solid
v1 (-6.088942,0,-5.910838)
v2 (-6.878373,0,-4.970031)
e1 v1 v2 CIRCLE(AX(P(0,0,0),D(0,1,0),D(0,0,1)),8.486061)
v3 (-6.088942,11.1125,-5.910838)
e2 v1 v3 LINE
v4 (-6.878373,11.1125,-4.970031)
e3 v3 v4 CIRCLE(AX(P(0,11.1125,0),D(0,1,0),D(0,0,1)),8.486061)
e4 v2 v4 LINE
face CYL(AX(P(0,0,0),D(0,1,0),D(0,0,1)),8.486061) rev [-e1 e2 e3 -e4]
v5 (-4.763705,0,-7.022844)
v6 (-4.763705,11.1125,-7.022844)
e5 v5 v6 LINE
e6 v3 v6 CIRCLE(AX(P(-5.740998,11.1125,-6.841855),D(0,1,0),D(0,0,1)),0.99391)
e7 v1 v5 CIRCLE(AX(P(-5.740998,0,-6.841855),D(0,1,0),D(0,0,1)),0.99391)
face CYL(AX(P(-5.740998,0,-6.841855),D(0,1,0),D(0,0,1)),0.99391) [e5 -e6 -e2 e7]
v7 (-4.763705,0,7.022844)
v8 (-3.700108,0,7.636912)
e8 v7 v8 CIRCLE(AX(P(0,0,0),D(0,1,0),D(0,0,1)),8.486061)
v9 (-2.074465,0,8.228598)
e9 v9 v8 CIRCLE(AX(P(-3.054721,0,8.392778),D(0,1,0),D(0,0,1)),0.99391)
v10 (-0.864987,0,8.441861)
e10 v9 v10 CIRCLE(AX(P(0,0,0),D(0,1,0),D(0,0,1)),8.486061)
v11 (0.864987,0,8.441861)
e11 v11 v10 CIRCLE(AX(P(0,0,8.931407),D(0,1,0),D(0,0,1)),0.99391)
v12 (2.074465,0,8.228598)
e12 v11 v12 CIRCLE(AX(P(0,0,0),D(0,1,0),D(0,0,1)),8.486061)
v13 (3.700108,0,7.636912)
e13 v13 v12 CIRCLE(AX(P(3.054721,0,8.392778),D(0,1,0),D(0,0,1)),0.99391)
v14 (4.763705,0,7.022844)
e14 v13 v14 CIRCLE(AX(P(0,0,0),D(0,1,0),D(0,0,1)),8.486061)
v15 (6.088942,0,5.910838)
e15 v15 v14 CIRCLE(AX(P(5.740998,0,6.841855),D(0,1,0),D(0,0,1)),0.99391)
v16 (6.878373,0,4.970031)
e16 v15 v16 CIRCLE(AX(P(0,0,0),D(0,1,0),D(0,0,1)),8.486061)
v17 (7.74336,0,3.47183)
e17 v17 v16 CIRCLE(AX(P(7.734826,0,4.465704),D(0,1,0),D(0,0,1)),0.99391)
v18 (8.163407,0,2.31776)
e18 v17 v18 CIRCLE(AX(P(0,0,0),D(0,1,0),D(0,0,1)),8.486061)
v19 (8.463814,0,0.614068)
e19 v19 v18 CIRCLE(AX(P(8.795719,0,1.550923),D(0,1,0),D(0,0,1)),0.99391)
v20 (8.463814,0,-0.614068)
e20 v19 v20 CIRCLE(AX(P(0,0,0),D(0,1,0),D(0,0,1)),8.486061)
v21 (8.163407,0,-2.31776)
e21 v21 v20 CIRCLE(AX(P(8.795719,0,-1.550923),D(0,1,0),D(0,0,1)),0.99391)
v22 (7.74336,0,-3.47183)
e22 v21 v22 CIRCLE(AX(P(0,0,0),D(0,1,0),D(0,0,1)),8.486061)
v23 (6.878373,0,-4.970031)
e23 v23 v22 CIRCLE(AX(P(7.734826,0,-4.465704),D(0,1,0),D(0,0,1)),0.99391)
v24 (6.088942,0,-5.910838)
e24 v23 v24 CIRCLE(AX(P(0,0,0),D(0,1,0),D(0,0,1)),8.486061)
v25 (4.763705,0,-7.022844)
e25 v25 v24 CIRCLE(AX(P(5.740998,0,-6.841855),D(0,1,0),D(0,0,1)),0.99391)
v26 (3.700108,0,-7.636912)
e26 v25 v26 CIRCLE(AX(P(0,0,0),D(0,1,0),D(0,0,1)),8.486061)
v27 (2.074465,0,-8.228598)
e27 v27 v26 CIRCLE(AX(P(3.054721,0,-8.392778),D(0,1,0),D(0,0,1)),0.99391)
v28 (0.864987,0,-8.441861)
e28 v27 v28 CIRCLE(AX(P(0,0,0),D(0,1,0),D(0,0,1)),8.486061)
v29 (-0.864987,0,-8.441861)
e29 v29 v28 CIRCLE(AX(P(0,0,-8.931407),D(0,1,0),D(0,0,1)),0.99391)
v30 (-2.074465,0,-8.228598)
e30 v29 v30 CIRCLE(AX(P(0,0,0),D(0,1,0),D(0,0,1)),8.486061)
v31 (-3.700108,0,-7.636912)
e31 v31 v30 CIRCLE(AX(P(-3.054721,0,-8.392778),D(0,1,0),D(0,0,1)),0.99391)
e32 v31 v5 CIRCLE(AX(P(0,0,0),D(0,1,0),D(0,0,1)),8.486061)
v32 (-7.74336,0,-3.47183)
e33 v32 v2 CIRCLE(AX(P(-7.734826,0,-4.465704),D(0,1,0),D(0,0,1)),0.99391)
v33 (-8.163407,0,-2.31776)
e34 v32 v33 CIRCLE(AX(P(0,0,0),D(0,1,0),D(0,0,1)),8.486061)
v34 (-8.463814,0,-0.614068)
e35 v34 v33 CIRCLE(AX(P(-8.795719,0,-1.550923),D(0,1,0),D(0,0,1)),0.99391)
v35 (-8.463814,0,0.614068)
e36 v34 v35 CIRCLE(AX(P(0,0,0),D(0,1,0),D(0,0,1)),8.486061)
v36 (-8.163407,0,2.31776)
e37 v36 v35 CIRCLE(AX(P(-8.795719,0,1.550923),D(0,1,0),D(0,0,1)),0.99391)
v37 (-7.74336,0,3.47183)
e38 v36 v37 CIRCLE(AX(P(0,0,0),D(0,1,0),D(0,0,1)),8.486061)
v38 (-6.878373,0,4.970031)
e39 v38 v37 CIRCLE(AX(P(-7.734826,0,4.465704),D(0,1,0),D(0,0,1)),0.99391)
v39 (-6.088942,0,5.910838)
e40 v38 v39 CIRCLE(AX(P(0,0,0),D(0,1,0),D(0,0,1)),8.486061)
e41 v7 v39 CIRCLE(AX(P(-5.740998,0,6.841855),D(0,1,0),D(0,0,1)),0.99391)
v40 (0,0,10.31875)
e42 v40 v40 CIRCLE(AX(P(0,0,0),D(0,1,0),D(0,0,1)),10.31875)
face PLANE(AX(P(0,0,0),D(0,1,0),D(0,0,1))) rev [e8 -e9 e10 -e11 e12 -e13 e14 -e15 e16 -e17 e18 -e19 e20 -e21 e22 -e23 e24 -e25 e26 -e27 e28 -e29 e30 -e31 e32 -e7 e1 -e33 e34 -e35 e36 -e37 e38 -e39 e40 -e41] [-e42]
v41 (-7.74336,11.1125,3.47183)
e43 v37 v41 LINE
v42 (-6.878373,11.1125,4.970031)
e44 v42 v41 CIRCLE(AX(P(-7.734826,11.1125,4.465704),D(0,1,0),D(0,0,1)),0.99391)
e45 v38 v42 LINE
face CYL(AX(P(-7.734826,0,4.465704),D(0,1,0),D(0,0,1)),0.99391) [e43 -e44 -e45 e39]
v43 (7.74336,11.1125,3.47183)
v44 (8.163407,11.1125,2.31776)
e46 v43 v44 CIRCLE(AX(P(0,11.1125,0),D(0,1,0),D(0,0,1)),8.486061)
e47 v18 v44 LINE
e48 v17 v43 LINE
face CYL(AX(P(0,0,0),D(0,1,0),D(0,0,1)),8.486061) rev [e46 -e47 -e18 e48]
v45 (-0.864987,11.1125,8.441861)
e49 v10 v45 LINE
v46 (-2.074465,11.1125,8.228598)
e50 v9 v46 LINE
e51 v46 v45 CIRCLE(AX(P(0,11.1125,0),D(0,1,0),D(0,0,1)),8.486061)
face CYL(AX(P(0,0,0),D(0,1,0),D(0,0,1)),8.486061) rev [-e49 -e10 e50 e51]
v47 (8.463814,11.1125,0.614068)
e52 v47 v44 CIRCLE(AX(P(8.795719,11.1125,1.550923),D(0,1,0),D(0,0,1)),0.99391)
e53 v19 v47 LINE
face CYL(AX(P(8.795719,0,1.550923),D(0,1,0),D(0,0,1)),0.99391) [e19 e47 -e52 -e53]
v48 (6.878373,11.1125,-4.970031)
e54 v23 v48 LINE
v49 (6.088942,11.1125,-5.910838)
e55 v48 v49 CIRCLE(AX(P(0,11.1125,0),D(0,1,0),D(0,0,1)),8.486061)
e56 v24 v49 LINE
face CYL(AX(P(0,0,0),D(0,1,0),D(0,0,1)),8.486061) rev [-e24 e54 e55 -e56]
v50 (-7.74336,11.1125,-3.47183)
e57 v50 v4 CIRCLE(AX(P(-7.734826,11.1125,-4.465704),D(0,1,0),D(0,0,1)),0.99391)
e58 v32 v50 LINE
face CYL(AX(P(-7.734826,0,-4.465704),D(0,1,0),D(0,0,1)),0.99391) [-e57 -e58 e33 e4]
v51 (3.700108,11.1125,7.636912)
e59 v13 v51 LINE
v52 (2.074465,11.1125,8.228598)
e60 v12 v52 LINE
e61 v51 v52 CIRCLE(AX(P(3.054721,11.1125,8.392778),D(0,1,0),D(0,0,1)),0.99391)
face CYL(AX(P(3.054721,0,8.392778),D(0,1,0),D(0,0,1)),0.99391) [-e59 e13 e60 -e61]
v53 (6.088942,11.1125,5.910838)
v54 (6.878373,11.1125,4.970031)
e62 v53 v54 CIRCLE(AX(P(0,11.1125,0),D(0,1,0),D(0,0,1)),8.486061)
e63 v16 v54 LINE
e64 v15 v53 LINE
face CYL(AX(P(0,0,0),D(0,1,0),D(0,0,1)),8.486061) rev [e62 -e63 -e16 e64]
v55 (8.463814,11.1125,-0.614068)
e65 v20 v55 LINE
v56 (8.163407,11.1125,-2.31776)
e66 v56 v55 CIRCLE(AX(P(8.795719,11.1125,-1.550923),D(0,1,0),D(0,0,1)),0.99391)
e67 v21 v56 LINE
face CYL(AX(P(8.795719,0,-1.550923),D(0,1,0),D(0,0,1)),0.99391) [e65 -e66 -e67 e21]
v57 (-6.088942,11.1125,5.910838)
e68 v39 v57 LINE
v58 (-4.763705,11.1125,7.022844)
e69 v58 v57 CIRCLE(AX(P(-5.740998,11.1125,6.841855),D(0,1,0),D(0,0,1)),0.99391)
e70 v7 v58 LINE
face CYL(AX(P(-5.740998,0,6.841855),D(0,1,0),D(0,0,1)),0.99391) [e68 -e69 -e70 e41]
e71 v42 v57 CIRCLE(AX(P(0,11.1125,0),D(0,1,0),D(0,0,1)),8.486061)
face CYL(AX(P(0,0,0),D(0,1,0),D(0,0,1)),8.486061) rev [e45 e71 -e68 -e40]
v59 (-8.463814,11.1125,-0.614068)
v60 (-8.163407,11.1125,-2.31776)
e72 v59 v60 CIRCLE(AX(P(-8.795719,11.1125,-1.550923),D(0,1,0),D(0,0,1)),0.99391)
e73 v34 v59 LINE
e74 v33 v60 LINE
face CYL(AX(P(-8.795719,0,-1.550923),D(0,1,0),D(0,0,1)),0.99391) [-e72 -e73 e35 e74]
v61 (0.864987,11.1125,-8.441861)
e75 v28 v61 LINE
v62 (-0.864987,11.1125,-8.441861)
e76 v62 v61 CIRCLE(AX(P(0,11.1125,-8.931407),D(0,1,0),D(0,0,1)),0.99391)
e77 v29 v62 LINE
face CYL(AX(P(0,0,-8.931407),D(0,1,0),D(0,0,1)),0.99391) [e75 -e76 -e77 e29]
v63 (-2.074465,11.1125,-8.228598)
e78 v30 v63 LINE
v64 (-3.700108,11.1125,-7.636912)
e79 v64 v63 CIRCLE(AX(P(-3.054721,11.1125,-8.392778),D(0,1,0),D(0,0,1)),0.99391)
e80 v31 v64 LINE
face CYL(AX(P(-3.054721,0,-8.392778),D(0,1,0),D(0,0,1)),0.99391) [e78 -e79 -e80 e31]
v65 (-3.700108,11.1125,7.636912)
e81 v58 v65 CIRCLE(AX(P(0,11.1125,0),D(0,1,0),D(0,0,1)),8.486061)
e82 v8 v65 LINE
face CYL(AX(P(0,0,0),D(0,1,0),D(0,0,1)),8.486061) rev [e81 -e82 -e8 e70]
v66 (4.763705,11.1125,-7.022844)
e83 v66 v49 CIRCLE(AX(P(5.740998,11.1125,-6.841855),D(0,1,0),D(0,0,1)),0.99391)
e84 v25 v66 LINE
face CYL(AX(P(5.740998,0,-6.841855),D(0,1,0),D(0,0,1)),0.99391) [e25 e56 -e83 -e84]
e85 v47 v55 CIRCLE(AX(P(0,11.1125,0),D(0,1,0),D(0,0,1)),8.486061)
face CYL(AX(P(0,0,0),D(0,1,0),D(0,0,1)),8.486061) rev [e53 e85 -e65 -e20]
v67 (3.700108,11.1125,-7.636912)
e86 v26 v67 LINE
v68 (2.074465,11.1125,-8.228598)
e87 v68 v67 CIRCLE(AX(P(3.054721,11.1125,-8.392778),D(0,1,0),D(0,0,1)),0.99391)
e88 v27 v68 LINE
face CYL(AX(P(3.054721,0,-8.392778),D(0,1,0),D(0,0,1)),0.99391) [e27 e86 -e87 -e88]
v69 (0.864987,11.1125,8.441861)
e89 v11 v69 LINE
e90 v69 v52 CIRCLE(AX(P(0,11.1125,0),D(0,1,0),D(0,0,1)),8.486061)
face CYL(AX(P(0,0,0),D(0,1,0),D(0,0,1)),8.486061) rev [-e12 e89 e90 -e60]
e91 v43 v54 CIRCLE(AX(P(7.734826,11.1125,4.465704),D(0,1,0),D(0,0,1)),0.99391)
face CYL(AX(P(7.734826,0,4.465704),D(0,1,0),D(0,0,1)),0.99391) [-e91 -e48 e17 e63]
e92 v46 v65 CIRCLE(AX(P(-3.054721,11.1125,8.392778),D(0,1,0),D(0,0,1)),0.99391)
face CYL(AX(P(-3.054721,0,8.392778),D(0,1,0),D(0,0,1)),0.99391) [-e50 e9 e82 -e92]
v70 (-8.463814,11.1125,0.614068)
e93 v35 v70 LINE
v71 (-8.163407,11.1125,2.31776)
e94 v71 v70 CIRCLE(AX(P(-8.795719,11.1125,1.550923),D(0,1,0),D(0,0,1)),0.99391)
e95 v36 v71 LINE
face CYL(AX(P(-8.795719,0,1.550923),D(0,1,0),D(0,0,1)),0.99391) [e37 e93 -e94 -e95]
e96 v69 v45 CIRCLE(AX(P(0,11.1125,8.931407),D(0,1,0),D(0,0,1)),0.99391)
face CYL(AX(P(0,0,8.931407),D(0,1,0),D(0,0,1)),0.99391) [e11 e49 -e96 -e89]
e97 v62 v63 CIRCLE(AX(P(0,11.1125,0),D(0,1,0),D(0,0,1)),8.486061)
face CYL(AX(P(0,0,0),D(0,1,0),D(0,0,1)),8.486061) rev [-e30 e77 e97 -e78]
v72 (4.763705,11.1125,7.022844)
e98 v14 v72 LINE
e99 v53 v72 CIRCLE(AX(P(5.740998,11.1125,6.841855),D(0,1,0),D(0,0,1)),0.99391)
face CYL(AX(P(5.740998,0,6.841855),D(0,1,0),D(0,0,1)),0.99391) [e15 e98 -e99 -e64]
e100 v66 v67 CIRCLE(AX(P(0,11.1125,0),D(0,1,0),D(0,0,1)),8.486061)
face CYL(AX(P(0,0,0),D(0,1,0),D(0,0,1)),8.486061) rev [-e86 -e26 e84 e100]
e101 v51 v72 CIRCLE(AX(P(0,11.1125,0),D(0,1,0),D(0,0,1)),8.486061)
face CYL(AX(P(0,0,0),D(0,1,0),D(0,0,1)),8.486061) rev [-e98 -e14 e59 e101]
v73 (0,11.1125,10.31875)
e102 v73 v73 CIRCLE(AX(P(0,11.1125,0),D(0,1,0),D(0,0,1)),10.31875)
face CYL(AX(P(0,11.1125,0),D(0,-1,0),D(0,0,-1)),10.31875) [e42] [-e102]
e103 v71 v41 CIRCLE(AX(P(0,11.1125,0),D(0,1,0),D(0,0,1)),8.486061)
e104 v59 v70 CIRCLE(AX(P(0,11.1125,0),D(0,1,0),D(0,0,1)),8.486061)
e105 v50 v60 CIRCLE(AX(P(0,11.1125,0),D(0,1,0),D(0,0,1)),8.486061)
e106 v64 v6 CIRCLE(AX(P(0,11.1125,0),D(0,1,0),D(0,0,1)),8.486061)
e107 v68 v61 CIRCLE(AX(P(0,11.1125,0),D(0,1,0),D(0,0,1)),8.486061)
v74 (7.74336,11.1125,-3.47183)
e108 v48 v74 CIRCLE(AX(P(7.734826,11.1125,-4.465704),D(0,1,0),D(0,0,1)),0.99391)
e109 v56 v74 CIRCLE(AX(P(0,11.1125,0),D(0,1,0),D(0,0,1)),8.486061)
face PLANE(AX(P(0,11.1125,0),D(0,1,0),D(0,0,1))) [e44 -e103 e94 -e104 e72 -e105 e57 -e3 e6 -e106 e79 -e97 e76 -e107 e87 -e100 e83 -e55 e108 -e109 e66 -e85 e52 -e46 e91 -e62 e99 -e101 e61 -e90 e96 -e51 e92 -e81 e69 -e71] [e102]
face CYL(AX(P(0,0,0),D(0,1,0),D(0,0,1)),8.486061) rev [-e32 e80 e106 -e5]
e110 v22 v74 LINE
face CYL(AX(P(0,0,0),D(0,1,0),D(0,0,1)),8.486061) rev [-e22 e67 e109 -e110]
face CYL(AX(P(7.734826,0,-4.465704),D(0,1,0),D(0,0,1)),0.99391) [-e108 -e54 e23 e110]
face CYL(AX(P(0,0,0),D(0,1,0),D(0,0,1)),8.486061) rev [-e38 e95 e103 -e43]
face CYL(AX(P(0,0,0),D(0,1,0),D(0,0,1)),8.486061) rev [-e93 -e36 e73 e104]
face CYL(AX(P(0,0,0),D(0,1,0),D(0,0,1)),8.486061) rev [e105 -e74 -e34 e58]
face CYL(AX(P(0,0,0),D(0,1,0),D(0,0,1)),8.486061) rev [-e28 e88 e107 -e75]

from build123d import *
from OCP.BRepAlgoAPI import BRepAlgoAPI_Cut
from OCP.TopTools import TopTools_ListOfShape

# Parameters (mm, degrees)
SKETCH1_R           = 10.31875
SKETCH1_R_2         = 7.9375
BOSS_EXTRUDE1_DEPTH = 11.1125
CUT_EXTRUDE1_DEPTH  = 11.1125


with BuildPart() as part:
    # Sketch1 → Boss-Extrude1 (new body)
    with BuildSketch(Plane(origin=(0, 0, 0), x_dir=(1, 0, 0), z_dir=(0, 1, 0))):
        Circle(SKETCH1_R)
        Circle(SKETCH1_R_2, mode=Mode.SUBTRACT)
    extrude(amount=BOSS_EXTRUDE1_DEPTH)


with BuildPart() as cut_extrude1_tool:
    # Sketch2 → Cut-Extrude1 (new body)
    with BuildSketch(Plane(origin=(0, 11.1125, 0), x_dir=(1, 0, 0), z_dir=(0, 1, 0))):
        with BuildLine():
            ThreePointArc((7.816908652, 1.378331901), (7.937497068, 0), (7.816908652, -1.378331901))
            ThreePointArc((7.816908652, -1.378331901), (8.037089612, -0.908786504), (8.463813852, -0.614068064))
            ThreePointArc((8.463813852, -0.614068064), (8.4860606, 0), (8.463813852, 0.614068064))
            ThreePointArc((8.463813852, 0.614068064), (8.037089612, 0.908786504), (7.816908652, 1.378331901))
        make_face()
        with BuildLine():
            ThreePointArc((6.874074104, 3.968748534), (7.458807423, 2.714783885), (7.816908652, 1.378331901))
            ThreePointArc((7.816908652, 1.378331901), (7.863217092, 1.89486657), (8.163407067, 2.317759598))
            ThreePointArc((8.163407067, 2.317759598), (7.974288525, 2.902403663), (7.743359773, 3.471830055))
            ThreePointArc((7.743359773, 3.471830055), (7.241570511, 3.602826513), (6.874074104, 3.968748534))
        make_face()
        with BuildLine():
            ThreePointArc((8.163407067, -2.317759598), (7.863217092, -1.89486657), (7.816908652, -1.378331901))
            ThreePointArc((7.816908652, -1.378331901), (7.458807423, -2.714783885), (6.874074104, -3.968748534))
            ThreePointArc((6.874074104, -3.968748534), (7.241570511, -3.602826513), (7.743359773, -3.471830055))
            ThreePointArc((7.743359773, -3.471830055), (7.974288525, -2.902403663), (8.163407067, -2.317759598))
        make_face()
        with BuildLine():
            ThreePointArc((5.102124767, 6.080475521), (6.080475521, 5.102124767), (6.874074104, 3.968748534))
            ThreePointArc((6.874074104, 3.968748534), (6.740924541, 4.469970769), (6.878372912, 4.970031246))
            ThreePointArc((6.878372912, 4.970031246), (6.500699566, 5.454734609), (6.088942225, 5.910838103))
            ThreePointArc((6.088942225, 5.910838103), (5.572611132, 5.862312472), (5.102124767, 6.080475521))
        make_face()
        with BuildLine():
            ThreePointArc((6.878372912, -4.970031246), (6.740924541, -4.469970769), (6.874074104, -3.968748534))
            ThreePointArc((6.874074104, -3.968748534), (6.080475521, -5.102124767), (5.102124767, -6.080475521))
            ThreePointArc((5.102124767, -6.080475521), (5.572611132, -5.862312472), (6.088942225, -5.910838103))
            ThreePointArc((6.088942225, -5.910838103), (6.500699566, -5.454734609), (6.878372912, -4.970031246))
        make_face()
        with BuildLine():
            ThreePointArc((2.714783885, 7.458807423), (3.968748534, 6.874074104), (5.102124767, 6.080475521))
            ThreePointArc((5.102124767, 6.080475521), (4.805577005, 6.505930525), (4.763705469, 7.022843776))
            ThreePointArc((4.763705469, 7.022843776), (4.2430303, 7.349144057), (3.700108383, 7.636911841))
            ThreePointArc((3.700108383, 7.636911841), (3.231512607, 7.414717029), (2.714783885, 7.458807423))
        make_face()
        with BuildLine():
            ThreePointArc((4.763705469, -7.022843776), (4.805577005, -6.505930525), (5.102124767, -6.080475521))
            ThreePointArc((5.102124767, -6.080475521), (3.968748534, -6.874074104), (2.714783885, -7.458807423))
            ThreePointArc((2.714783885, -7.458807423), (3.231512607, -7.414717029), (3.700108383, -7.636911841))
            ThreePointArc((3.700108383, -7.636911841), (4.2430303, -7.349144057), (4.763705469, -7.022843776))
        make_face()
        with BuildLine():
            ThreePointArc((0, 7.937497068), (1.378331901, 7.816908652), (2.714783885, 7.458807423))
            ThreePointArc((2.714783885, 7.458807423), (2.29060596, 7.757179042), (2.074464842, 8.228597701))
            ThreePointArc((2.074464842, 8.228597701), (1.473588959, 8.357138271), (0.864986861, 8.441861301))
            ThreePointArc((0.864986861, 8.441861301), (0.50064597, 8.072797282), (0, 7.937497068))
        make_face()
        with BuildLine():
            ThreePointArc((2.074464842, -8.228597701), (2.29060596, -7.757179042), (2.714783885, -7.458807423))
            ThreePointArc((2.714783885, -7.458807423), (1.378331901, -7.816908652), (0, -7.937497068))
            ThreePointArc((0, -7.937497068), (0.50064597, -8.072797282), (0.864986861, -8.441861301))
            ThreePointArc((0.864986861, -8.441861301), (1.473588959, -8.357138271), (2.074464842, -8.228597701))
        make_face()
        with BuildLine():
            ThreePointArc((-2.714783885, 7.458807423), (-1.378331901, 7.816908652), (0, 7.937497068))
            ThreePointArc((0, 7.937497068), (-0.50064597, 8.072797282), (-0.864986861, 8.441861301))
            ThreePointArc((-0.864986861, 8.441861301), (-1.473588959, 8.357138271), (-2.074464842, 8.228597701))
            ThreePointArc((-2.074464842, 8.228597701), (-2.29060596, 7.757179042), (-2.714783885, 7.458807423))
        make_face()
        with BuildLine():
            ThreePointArc((-0.864986861, -8.441861301), (-0.50064597, -8.072797282), (0, -7.937497068))
            ThreePointArc((0, -7.937497068), (-1.378331901, -7.816908652), (-2.714783885, -7.458807423))
            ThreePointArc((-2.714783885, -7.458807423), (-2.29060596, -7.757179042), (-2.074464842, -8.228597701))
            ThreePointArc((-2.074464842, -8.228597701), (-1.473588959, -8.357138271), (-0.864986861, -8.441861301))
        make_face()
        with BuildLine():
            ThreePointArc((-5.102124767, 6.080475521), (-3.968748534, 6.874074104), (-2.714783885, 7.458807423))
            ThreePointArc((-2.714783885, 7.458807423), (-3.231512607, 7.414717029), (-3.700108383, 7.636911841))
            ThreePointArc((-3.700108383, 7.636911841), (-4.2430303, 7.349144057), (-4.763705469, 7.022843776))
            ThreePointArc((-4.763705469, 7.022843776), (-4.805577005, 6.505930525), (-5.102124767, 6.080475521))
        make_face()
        with BuildLine():
            ThreePointArc((-3.700108383, -7.636911841), (-3.231512607, -7.414717029), (-2.714783885, -7.458807423))
            ThreePointArc((-2.714783885, -7.458807423), (-3.968748534, -6.874074104), (-5.102124767, -6.080475521))
            ThreePointArc((-5.102124767, -6.080475521), (-4.805577005, -6.505930525), (-4.763705469, -7.022843776))
            ThreePointArc((-4.763705469, -7.022843776), (-4.2430303, -7.349144057), (-3.700108383, -7.636911841))
        make_face()
        with BuildLine():
            ThreePointArc((-6.874074104, 3.968748534), (-6.080475521, 5.102124767), (-5.102124767, 6.080475521))
            ThreePointArc((-5.102124767, 6.080475521), (-5.572611132, 5.862312472), (-6.088942225, 5.910838103))
            ThreePointArc((-6.088942225, 5.910838103), (-6.500699566, 5.454734609), (-6.878372912, 4.970031246))
            ThreePointArc((-6.878372912, 4.970031246), (-6.740924541, 4.469970769), (-6.874074104, 3.968748534))
        make_face()
        with BuildLine():
            ThreePointArc((-6.088942225, -5.910838103), (-5.572611132, -5.862312472), (-5.102124767, -6.080475521))
            ThreePointArc((-5.102124767, -6.080475521), (-6.080475521, -5.102124767), (-6.874074104, -3.968748534))
            ThreePointArc((-6.874074104, -3.968748534), (-6.740924541, -4.469970769), (-6.878372912, -4.970031246))
            ThreePointArc((-6.878372912, -4.970031246), (-6.500699566, -5.454734609), (-6.088942225, -5.910838103))
        make_face()
        with BuildLine():
            ThreePointArc((-7.816908652, 1.378331901), (-7.458807423, 2.714783885), (-6.874074104, 3.968748534))
            ThreePointArc((-6.874074104, 3.968748534), (-7.241570511, 3.602826513), (-7.743359773, 3.471830055))
            ThreePointArc((-7.743359773, 3.471830055), (-7.974288525, 2.902403663), (-8.163407067, 2.317759598))
            ThreePointArc((-8.163407067, 2.317759598), (-7.863217092, 1.89486657), (-7.816908652, 1.378331901))
        make_face()
        with BuildLine():
            ThreePointArc((-7.743359773, -3.471830055), (-7.241570511, -3.602826513), (-6.874074104, -3.968748534))
            ThreePointArc((-6.874074104, -3.968748534), (-7.458807423, -2.714783885), (-7.816908652, -1.378331901))
            ThreePointArc((-7.816908652, -1.378331901), (-7.863217092, -1.89486657), (-8.163407067, -2.317759598))
            ThreePointArc((-8.163407067, -2.317759598), (-7.974288525, -2.902403663), (-7.743359773, -3.471830055))
        make_face()
        with BuildLine():
            ThreePointArc((-7.816908652, -1.378331901), (-7.937497068, 0), (-7.816908652, 1.378331901))
            ThreePointArc((-7.816908652, 1.378331901), (-8.037089612, 0.908786504), (-8.463813852, 0.614068064))
            ThreePointArc((-8.463813852, 0.614068064), (-8.4860606, 0), (-8.463813852, -0.614068064))
            ThreePointArc((-8.463813852, -0.614068064), (-8.037089612, -0.908786504), (-7.816908652, -1.378331901))
        make_face()
    extrude(amount=-CUT_EXTRUDE1_DEPTH)


with BuildPart() as part_1:
    add(part.part)

    # Cut-Extrude1: cut by cut_extrude1_tool, with a tolerance
    cut_extrude1_stock = TopTools_ListOfShape()
    cut_extrude1_stock.Append(part_1.part.wrapped)
    cut_extrude1_tools = TopTools_ListOfShape()
    cut_extrude1_tools.Append(cut_extrude1_tool.part.wrapped)
    cut_extrude1_cut = BRepAlgoAPI_Cut()
    cut_extrude1_cut.SetArguments(cut_extrude1_stock)
    cut_extrude1_cut.SetTools(cut_extrude1_tools)
    cut_extrude1_cut.SetFuzzyValue(0.00001)
    cut_extrude1_cut.Build()
    add(Compound.cast(cut_extrude1_cut.Shape()).solids(), mode=Mode.REPLACE)


solid = part_1.part
